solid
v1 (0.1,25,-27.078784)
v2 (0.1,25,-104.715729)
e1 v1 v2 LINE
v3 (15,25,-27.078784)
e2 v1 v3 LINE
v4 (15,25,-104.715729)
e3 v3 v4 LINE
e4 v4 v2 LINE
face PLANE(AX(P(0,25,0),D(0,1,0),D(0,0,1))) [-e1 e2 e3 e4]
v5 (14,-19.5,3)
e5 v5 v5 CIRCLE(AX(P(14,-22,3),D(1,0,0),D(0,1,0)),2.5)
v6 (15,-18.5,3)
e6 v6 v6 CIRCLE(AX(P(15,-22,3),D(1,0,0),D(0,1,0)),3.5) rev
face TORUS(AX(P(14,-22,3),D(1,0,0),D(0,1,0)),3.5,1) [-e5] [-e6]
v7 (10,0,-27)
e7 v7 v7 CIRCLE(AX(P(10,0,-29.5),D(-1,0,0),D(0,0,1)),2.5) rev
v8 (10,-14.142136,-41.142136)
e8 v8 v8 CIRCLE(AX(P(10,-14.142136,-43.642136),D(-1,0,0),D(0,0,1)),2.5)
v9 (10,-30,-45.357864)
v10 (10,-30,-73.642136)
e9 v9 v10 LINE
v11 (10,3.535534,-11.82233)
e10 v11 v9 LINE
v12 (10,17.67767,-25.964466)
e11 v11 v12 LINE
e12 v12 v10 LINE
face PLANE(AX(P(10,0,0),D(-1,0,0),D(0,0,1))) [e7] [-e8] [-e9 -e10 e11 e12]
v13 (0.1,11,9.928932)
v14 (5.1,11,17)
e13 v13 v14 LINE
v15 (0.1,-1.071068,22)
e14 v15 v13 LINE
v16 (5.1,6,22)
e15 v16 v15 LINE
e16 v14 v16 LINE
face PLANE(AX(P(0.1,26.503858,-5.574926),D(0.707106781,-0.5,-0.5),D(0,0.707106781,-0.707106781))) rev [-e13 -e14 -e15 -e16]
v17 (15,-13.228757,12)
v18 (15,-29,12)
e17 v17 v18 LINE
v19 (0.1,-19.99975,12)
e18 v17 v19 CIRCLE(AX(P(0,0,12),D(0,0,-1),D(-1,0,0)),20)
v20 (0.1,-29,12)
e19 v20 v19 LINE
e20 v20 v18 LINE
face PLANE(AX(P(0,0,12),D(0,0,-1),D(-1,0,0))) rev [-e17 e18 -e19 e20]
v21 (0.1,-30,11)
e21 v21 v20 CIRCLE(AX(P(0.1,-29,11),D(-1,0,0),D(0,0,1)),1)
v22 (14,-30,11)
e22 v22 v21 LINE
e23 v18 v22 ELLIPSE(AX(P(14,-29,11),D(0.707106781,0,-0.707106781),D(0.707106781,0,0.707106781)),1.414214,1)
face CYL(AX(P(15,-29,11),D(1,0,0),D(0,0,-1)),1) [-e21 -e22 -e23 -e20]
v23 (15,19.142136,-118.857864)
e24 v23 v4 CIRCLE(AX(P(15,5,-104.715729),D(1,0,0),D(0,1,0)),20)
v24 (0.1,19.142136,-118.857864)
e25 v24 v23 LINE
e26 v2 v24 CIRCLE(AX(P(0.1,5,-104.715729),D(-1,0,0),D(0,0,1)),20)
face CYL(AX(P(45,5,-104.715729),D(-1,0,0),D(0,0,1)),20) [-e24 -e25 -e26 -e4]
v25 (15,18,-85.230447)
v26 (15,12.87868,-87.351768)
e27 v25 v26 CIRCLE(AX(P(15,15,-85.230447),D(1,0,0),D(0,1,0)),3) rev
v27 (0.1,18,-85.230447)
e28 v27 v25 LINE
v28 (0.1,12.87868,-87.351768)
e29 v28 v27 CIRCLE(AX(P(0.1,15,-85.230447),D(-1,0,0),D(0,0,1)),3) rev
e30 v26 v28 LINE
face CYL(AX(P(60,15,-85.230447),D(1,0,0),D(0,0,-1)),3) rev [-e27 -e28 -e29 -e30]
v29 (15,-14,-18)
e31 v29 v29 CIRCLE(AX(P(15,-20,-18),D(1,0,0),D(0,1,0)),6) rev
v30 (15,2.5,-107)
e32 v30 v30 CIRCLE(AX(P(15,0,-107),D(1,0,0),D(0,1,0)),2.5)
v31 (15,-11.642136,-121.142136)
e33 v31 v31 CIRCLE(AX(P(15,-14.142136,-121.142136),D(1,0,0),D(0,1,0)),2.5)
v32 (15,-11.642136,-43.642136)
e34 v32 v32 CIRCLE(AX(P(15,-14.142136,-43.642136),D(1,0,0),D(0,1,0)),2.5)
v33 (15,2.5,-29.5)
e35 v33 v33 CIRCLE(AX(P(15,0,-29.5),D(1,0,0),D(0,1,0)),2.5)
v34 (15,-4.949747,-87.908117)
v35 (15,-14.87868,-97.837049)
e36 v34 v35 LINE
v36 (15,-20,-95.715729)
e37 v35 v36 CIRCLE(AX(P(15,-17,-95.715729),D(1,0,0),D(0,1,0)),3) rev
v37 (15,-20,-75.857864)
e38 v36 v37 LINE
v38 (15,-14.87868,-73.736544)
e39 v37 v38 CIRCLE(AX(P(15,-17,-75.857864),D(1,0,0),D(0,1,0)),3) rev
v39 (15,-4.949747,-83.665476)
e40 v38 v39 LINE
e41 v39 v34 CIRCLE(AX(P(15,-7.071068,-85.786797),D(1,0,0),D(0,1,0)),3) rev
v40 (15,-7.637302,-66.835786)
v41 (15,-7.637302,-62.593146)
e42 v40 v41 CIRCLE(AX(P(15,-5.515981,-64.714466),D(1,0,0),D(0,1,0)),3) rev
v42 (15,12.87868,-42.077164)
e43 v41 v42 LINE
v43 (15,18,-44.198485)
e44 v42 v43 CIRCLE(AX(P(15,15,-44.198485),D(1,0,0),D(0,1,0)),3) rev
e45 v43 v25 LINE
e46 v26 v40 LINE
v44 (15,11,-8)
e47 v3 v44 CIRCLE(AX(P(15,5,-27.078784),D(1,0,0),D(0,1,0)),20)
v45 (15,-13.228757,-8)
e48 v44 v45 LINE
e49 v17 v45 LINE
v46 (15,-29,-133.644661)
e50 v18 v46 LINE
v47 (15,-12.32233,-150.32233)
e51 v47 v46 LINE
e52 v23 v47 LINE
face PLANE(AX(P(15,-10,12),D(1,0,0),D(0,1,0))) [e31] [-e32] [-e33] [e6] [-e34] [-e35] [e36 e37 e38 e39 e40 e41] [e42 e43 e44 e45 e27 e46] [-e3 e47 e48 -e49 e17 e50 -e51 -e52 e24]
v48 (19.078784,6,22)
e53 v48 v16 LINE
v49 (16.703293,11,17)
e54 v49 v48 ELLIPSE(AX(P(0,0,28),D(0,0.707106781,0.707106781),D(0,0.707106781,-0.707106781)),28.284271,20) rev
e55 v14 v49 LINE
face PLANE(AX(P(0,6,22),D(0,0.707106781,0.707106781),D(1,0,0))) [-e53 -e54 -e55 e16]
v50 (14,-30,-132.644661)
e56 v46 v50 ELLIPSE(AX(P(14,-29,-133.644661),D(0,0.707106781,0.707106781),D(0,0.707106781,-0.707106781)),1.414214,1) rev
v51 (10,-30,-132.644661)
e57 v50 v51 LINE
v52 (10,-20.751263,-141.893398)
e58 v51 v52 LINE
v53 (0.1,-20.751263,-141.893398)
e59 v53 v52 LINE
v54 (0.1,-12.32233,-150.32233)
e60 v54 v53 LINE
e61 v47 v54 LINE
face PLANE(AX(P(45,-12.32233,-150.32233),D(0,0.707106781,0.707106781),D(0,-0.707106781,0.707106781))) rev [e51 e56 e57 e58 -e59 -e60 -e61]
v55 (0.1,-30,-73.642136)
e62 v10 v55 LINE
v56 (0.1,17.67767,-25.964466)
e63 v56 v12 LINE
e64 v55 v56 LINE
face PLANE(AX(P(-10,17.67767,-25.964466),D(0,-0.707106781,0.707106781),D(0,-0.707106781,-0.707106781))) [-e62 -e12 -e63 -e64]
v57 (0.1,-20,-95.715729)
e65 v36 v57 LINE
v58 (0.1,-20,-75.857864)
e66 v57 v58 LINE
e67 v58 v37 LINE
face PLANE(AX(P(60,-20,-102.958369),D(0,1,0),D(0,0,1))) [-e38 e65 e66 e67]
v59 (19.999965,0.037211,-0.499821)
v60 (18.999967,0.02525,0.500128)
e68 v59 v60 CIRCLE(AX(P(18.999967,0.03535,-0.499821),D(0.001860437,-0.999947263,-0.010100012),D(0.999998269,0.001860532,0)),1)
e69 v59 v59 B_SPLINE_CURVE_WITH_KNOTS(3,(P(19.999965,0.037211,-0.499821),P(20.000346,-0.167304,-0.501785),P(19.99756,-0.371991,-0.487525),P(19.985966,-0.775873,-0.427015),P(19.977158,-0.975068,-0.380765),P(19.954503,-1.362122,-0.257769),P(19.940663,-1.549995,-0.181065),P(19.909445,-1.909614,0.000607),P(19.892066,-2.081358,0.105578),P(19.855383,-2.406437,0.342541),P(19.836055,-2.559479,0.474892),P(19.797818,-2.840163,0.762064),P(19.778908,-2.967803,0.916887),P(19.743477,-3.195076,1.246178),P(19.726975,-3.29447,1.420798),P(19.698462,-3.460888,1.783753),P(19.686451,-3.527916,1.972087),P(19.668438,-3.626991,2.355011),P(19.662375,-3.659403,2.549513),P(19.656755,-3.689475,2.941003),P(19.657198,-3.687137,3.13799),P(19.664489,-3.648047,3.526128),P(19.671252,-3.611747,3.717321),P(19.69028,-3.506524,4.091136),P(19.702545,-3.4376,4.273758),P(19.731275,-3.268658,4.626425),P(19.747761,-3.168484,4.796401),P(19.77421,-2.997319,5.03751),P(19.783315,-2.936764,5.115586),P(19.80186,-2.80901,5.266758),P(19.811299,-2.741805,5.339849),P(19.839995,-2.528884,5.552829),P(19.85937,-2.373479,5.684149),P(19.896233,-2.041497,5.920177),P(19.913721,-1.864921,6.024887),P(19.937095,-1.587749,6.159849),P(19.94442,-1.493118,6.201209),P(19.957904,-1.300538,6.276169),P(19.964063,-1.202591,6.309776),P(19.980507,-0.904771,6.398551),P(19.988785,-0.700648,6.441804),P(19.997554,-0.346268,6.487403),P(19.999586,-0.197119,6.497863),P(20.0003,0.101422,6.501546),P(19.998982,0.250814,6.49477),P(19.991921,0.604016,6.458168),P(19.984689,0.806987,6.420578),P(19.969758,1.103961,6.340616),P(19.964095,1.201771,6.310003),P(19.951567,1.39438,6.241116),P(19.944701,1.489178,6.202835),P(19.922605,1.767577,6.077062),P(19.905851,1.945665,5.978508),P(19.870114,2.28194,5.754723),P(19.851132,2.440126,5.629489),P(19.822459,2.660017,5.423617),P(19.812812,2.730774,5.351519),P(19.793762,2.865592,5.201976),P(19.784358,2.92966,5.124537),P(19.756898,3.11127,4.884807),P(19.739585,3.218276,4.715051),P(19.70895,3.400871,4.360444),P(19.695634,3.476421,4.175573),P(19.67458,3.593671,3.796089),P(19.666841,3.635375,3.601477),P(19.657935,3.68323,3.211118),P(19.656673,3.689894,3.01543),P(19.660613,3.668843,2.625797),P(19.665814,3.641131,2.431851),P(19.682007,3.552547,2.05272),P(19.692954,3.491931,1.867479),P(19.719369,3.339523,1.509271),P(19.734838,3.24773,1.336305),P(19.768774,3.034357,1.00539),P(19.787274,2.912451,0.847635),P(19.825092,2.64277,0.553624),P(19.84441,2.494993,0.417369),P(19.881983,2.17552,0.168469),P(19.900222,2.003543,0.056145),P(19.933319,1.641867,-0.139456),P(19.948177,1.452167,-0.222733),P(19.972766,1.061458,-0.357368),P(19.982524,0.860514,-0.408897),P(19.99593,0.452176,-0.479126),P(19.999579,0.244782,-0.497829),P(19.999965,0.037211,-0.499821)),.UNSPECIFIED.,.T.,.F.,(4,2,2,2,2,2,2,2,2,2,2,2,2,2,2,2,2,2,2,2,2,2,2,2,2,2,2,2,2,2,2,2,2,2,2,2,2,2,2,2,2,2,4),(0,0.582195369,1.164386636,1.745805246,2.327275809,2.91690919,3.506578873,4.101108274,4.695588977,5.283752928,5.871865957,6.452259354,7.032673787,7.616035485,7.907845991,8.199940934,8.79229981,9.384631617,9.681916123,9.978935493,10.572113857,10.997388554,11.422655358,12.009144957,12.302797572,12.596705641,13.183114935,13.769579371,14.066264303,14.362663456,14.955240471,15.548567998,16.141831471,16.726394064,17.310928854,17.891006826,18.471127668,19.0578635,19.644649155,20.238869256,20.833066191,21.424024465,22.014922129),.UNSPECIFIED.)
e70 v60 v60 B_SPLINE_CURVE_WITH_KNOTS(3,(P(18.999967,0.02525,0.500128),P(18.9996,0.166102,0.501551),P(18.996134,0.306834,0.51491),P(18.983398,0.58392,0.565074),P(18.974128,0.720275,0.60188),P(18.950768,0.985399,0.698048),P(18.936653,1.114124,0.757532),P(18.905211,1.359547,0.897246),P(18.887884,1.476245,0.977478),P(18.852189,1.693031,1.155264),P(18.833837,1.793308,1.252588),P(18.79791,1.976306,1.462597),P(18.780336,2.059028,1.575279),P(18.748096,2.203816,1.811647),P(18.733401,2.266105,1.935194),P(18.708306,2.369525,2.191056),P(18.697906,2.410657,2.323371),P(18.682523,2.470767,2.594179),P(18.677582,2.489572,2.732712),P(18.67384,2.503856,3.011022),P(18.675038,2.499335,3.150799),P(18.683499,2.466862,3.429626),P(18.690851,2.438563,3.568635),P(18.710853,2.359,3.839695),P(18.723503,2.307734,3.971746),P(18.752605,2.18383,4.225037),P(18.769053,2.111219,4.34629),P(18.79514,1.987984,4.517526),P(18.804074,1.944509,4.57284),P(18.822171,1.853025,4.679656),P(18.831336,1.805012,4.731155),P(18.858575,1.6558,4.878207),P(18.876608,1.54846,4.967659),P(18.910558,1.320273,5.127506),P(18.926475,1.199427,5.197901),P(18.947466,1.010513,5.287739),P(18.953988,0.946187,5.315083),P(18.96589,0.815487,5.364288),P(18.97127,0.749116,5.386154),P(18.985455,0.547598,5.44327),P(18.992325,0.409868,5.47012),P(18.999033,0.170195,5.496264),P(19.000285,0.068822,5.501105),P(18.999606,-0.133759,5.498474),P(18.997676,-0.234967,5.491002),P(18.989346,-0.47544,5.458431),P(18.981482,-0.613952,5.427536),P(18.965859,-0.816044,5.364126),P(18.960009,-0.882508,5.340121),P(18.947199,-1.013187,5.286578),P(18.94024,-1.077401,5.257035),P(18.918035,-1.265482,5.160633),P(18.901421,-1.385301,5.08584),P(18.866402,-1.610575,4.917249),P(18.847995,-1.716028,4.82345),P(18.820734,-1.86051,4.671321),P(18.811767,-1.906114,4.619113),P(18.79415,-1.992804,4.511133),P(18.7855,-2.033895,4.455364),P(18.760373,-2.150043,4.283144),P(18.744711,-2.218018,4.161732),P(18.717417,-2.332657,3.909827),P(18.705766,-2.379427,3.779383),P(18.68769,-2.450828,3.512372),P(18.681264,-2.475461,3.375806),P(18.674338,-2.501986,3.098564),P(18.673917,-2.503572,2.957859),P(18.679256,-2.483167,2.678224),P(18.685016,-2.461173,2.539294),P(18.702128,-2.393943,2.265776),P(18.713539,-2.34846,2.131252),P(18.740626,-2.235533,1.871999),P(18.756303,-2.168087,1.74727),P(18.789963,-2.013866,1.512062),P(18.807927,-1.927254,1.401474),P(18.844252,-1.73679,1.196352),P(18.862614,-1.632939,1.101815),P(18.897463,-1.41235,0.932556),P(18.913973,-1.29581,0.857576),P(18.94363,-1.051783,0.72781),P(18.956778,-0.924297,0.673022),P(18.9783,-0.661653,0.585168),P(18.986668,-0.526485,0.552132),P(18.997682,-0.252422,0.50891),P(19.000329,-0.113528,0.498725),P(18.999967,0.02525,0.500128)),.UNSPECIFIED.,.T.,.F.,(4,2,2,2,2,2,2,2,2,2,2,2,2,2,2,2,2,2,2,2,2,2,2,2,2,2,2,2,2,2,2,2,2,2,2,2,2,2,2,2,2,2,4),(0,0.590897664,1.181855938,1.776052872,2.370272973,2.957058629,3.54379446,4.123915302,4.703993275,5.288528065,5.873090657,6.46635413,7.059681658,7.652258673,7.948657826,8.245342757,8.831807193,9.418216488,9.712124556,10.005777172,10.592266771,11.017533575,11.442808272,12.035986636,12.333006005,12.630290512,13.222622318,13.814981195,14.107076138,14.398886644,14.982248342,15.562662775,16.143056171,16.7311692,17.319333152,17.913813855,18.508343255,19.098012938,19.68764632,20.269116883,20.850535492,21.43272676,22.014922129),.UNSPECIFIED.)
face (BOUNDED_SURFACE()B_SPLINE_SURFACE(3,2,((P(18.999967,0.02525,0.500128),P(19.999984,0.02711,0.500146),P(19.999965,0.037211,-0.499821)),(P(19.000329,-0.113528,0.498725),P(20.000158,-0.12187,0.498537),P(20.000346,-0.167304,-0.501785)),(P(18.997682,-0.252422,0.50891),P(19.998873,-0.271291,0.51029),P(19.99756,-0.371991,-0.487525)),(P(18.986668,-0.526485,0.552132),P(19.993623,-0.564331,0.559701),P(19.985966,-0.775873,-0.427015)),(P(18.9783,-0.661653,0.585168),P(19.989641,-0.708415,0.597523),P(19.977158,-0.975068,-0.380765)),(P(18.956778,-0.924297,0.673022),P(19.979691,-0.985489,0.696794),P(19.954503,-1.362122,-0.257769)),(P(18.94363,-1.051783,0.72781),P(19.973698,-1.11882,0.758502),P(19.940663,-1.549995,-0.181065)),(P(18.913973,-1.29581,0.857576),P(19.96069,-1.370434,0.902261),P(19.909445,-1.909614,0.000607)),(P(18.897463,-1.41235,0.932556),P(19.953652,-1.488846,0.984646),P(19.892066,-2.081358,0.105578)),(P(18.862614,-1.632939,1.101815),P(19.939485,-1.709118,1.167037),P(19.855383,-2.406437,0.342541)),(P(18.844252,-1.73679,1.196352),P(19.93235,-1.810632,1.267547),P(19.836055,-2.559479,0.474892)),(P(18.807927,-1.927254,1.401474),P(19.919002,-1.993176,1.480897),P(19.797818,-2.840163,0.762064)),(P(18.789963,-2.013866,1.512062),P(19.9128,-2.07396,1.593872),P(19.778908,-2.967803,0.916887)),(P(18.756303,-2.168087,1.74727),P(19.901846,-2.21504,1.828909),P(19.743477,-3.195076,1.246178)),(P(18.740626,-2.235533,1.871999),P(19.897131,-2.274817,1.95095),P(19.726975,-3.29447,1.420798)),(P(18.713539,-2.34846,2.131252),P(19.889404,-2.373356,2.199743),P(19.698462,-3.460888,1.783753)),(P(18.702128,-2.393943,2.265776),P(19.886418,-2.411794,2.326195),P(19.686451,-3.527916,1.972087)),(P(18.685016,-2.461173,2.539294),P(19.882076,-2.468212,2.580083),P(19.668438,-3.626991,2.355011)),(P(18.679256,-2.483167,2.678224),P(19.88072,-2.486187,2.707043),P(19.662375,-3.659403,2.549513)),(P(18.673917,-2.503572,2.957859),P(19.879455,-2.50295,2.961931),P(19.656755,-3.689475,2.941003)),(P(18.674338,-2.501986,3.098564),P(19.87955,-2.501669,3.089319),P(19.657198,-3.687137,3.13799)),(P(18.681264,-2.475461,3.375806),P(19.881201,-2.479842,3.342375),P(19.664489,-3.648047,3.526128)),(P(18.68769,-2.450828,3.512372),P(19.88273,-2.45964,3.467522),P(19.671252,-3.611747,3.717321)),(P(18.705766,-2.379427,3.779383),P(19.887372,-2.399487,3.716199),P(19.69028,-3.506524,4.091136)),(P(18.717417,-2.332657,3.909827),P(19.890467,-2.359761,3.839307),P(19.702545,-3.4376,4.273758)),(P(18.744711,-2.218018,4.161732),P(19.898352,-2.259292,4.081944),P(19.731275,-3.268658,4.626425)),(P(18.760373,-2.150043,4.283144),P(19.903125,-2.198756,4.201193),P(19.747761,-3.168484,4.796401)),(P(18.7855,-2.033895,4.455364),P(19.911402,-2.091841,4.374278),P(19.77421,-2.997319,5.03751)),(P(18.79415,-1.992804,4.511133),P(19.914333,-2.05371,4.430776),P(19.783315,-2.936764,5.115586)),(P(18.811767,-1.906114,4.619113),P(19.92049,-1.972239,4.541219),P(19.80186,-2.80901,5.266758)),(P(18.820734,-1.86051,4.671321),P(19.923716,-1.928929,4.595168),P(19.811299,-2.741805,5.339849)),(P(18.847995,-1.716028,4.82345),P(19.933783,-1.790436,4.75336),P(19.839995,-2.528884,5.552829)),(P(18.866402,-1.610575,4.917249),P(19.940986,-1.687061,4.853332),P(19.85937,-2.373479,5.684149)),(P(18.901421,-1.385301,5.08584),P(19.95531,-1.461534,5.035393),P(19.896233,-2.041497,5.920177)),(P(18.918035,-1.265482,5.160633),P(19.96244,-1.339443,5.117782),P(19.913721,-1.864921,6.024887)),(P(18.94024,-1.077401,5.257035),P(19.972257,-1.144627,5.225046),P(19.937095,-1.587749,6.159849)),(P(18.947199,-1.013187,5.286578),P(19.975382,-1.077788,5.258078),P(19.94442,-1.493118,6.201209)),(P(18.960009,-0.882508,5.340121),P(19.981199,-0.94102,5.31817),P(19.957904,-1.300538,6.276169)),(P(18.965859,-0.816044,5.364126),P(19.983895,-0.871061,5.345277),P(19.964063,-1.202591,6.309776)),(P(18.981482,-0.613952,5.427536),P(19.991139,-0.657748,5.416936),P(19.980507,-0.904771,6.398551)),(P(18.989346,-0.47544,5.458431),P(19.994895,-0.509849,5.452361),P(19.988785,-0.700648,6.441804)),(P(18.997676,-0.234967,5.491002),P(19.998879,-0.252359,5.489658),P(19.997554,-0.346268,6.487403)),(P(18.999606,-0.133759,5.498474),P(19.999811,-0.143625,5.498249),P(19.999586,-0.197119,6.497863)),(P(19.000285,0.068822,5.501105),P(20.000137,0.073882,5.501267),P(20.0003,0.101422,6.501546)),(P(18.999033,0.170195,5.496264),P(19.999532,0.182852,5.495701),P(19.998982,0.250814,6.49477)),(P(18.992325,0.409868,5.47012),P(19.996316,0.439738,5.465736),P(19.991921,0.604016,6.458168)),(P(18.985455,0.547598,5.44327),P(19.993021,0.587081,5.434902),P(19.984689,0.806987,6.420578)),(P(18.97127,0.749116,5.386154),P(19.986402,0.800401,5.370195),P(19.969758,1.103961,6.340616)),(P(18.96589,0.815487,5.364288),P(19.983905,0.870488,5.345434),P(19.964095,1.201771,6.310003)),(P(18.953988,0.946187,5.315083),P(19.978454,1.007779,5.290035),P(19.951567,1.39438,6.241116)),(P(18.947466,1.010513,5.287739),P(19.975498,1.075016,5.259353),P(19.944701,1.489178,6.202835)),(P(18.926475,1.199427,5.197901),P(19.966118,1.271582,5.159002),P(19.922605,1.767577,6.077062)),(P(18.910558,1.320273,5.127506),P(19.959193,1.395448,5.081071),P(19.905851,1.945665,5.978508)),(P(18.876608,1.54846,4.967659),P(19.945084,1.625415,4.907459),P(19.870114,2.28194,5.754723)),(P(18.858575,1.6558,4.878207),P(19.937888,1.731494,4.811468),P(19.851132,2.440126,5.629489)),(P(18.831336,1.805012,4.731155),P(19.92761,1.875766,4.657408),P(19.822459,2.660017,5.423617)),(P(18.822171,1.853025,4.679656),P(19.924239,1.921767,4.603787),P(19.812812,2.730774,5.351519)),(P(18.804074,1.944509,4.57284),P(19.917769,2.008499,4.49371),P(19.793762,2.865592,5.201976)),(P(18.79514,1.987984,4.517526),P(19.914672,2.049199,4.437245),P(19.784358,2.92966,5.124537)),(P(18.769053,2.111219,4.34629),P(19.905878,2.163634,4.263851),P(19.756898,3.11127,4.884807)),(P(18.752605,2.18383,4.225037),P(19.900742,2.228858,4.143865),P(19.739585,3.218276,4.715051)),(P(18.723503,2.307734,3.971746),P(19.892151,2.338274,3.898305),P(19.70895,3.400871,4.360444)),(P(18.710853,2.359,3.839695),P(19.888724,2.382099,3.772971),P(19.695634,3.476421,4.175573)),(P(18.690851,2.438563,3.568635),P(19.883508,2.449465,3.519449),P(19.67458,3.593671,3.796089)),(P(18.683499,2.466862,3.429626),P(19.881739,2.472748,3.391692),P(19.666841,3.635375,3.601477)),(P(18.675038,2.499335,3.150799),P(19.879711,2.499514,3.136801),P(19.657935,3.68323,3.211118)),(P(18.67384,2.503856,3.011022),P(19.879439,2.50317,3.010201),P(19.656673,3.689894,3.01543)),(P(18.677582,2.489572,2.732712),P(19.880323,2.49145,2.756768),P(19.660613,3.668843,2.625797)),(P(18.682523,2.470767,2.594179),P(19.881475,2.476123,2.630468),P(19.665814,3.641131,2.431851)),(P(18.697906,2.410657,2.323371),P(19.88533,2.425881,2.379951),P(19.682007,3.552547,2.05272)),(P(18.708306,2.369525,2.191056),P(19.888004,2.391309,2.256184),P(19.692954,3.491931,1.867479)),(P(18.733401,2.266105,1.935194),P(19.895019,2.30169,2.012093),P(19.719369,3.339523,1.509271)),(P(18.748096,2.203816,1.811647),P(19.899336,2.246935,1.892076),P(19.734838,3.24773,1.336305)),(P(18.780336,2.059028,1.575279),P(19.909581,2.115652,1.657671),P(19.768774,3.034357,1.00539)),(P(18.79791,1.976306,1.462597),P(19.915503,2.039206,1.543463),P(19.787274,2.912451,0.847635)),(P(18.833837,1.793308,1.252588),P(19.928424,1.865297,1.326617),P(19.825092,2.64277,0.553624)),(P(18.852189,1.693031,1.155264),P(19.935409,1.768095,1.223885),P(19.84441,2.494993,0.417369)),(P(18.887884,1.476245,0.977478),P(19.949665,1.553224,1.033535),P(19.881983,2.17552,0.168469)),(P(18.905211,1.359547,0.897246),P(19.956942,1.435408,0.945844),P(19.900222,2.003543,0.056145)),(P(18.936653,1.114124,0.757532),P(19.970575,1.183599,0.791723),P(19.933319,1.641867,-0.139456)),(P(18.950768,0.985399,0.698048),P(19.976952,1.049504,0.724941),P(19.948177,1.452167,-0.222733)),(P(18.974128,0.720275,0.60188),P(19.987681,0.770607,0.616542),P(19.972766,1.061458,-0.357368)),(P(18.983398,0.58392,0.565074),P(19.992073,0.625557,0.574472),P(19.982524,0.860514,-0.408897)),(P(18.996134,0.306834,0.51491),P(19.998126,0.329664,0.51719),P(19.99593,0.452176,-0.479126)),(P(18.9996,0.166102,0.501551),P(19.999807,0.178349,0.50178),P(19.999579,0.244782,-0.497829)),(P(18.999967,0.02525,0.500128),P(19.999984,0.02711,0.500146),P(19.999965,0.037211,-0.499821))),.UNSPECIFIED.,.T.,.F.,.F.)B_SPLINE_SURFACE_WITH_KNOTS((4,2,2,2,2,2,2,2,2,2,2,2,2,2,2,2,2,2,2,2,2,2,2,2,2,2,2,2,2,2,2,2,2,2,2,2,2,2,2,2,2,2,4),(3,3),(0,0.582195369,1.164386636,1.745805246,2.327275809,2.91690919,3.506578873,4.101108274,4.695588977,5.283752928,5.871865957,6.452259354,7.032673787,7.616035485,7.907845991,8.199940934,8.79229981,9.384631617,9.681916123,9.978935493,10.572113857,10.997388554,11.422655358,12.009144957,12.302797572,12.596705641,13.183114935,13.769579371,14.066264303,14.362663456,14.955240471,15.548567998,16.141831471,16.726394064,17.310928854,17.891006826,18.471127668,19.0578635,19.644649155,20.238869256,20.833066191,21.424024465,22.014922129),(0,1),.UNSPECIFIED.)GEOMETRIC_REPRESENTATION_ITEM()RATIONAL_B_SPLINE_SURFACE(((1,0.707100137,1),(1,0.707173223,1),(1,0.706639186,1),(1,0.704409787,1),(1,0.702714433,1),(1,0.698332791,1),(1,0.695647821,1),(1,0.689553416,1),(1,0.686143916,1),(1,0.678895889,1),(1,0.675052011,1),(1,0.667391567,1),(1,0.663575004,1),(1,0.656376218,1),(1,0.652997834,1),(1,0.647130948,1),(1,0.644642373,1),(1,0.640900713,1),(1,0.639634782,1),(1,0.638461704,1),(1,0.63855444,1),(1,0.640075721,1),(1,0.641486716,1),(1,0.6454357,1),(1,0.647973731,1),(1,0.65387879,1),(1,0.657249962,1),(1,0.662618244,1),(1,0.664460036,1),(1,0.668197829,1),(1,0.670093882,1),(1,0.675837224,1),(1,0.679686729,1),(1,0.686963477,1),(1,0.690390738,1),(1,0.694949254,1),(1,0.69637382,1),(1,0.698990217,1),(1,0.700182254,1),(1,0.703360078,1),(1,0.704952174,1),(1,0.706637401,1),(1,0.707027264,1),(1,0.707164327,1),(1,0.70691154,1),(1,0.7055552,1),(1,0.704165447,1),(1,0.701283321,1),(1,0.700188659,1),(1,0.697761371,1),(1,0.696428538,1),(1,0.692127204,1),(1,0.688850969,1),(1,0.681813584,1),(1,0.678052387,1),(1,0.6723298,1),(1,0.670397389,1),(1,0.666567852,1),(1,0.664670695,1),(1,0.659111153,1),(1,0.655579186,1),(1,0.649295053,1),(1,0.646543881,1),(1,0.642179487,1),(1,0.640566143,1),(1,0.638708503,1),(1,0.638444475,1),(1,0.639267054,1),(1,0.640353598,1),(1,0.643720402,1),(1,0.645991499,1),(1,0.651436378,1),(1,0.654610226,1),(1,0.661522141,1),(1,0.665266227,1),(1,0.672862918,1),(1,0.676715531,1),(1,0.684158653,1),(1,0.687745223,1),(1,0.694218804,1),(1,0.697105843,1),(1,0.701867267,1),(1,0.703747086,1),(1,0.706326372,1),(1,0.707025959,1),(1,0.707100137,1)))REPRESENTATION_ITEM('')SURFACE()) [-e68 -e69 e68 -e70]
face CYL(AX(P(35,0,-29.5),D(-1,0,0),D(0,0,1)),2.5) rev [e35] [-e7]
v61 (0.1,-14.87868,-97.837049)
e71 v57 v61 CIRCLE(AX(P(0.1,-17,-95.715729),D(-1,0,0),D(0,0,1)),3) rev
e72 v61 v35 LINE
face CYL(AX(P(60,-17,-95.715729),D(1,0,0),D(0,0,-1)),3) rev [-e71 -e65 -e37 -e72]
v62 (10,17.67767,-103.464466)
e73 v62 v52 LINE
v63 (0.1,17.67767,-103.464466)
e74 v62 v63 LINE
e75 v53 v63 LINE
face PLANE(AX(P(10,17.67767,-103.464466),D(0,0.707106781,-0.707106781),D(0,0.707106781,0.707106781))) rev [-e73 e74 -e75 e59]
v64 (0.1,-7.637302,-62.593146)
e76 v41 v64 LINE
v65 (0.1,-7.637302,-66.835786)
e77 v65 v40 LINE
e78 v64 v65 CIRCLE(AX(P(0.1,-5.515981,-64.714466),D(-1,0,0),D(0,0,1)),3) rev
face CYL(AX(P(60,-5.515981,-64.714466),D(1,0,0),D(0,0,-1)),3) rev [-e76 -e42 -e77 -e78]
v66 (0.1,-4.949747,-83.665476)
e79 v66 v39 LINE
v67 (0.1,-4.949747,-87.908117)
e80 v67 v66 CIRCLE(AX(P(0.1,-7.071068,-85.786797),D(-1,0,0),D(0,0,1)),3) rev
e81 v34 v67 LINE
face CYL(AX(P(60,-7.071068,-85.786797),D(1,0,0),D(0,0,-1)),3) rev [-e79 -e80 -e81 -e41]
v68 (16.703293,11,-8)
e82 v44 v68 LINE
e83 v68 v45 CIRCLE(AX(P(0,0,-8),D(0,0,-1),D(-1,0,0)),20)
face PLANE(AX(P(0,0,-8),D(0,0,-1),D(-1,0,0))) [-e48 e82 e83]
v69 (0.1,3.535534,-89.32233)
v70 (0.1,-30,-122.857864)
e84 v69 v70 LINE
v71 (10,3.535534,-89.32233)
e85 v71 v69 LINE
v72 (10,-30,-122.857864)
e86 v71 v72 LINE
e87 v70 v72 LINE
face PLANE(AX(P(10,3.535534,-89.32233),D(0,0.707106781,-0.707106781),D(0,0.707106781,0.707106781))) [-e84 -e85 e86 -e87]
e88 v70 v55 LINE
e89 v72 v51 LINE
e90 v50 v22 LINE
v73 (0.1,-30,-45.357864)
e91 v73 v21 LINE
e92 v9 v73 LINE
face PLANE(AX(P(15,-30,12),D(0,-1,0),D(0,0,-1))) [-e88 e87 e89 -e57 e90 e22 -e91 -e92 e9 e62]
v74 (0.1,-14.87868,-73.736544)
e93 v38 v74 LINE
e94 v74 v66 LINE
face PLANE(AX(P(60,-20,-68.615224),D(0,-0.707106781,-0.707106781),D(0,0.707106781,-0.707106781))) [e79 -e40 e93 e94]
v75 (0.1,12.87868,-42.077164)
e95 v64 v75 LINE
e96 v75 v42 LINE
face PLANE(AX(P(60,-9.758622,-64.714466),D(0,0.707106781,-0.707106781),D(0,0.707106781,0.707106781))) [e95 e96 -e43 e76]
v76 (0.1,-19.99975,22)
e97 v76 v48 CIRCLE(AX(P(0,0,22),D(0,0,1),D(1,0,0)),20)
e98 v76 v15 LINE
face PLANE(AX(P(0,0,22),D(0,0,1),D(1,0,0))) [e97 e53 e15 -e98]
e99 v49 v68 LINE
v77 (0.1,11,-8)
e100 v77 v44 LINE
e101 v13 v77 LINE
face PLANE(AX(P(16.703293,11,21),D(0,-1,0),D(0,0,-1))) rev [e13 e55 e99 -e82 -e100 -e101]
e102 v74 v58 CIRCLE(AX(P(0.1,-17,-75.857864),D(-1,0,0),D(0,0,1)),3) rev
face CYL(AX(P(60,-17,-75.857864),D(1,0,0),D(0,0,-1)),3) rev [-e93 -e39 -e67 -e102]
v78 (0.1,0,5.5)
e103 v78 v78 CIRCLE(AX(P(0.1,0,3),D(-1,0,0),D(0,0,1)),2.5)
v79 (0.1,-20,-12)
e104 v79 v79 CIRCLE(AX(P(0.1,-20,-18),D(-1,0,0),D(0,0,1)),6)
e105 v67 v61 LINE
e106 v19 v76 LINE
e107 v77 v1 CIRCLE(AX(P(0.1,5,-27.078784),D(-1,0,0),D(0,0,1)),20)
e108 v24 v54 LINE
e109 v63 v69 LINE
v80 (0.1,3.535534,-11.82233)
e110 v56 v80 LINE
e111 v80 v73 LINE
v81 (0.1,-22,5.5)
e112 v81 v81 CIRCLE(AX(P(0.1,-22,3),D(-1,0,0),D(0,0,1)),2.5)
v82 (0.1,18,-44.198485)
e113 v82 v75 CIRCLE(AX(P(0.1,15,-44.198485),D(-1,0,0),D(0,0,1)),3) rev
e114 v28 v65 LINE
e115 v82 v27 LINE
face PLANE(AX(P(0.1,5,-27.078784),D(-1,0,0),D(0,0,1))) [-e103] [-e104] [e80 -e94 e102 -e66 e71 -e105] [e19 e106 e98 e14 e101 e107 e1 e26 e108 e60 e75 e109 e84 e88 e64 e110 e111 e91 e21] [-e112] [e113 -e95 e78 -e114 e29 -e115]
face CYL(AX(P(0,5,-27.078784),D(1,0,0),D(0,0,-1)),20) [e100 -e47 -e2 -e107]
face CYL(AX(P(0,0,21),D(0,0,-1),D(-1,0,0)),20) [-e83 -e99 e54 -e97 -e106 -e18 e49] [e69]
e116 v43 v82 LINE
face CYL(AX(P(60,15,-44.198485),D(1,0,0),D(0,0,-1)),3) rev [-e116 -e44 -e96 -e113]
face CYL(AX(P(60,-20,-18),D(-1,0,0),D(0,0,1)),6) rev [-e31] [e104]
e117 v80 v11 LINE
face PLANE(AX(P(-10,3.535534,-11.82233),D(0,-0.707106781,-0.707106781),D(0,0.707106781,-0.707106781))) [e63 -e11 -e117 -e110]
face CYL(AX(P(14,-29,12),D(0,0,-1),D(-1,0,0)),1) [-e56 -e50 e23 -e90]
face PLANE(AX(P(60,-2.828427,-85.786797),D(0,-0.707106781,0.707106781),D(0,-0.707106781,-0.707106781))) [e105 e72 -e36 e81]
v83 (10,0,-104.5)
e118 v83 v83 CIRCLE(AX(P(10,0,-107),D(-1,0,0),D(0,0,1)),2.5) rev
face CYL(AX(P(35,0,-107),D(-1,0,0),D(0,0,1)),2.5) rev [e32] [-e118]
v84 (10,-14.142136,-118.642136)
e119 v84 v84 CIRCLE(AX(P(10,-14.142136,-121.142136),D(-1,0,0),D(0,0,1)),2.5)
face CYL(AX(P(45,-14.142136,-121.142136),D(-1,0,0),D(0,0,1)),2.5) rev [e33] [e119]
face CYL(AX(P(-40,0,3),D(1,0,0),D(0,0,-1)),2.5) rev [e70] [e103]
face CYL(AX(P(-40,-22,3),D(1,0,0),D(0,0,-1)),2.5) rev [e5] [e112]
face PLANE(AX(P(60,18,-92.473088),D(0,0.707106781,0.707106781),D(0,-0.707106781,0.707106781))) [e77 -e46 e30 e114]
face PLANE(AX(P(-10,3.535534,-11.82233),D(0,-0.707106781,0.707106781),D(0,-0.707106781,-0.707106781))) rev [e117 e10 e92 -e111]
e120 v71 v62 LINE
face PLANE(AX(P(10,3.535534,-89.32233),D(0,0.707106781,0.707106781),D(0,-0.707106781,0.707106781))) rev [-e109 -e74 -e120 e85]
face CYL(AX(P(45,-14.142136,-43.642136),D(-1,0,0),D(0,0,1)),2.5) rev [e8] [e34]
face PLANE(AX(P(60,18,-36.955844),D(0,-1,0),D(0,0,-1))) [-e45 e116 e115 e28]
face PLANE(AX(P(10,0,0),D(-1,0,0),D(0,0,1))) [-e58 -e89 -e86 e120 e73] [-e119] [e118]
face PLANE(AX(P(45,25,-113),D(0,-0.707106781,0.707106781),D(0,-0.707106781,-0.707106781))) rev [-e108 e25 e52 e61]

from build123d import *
from build123d.topology import SkipClean

# Parameters (mm, degrees)
EXTRUDE_1_DEPTH            = 21
SKETCH_2_W                 = 20
SKETCH_2_H                 = 20
CUT_EXTRUDE_1_DEPTH        = 10
SKETCH_3_R                 = 25
EXTRUDE_2_DEPTH            = 2
SKETCH_4_W                 = 20
SKETCH_4_H                 = 20
CUT_EXTRUDE_2_DEPTH        = 20
SKETCH_5_W                 = 67.669648092
SKETCH_5_H                 = 52.455829112
CUT_EXTRUDE_3_DEPTH        = 22
EXTRUDE_5_DEPTH            = 1
CUT_EXTRUDE_START          = -6
CUT_EXTRUDE_12_DEPTH       = 6
CUT_EXTRUDE_13_DEPTH       = 2
SKETCH_21_W                = 20
SKETCH_21_H                = 20
EXTRUDE_7_DEPTH            = 19
SKETCH_22_W                = 30
SKETCH_22_H                = 20
EXTRUDE_8_DEPTH            = 10
EXTRUDE_START              = 10
EXTRUDE_9_DEPTH            = 10
SKETCH_24_W                = 30
SKETCH_24_H                = 50
EXTRUDE_10_DEPTH           = 160
SKETCH_26_R                = 2.5
CUT_EXTRUDE_15_DEPTH       = 50
CUT_EXTRUDE_1_2_DEPTH      = 10
CUT_EXTRUDE_1_2_DEPTH_BACK = 10
SKETCH_28_W                = 30
SKETCH_28_H                = 160
EXTRUDE_11_DEPTH           = 5
CUT_EXTRUDE_16_DEPTH       = 25
CUT_EXTRUDE_16_DEPTH_BACK  = 60
SKETCH_29_R                = 2.5
CUT_EXTRUDE_17_DEPTH       = 60
CUT_EXTRUDE_18_DEPTH       = 60
CUT_EXTRUDE_18_DEPTH_BACK  = 60
CUT_EXTRUDE_19_DEPTH       = 60
CUT_EXTRUDE_19_DEPTH_BACK  = 60
FILLET_4_R                 = 3
CUT_EXTRUDE_20_DEPTH       = 60
CUT_EXTRUDE_20_DEPTH_BACK  = 60
SKETCH_33_R                = 6
CUT_EXTRUDE_21_DEPTH       = 60
FILLET_5_R                 = 20
SKETCH_35_R                = 2.5
CUT_EXTRUDE_22_DEPTH       = 60
FILLET_6_R                 = 20
SKETCH_36_W                = 257.466692503
SKETCH_36_H                = 187.225779306
CUT_EXTRUDE_23_DEPTH       = 82
CUT_EXTRUDE_24_DEPTH       = 0.1
FILLET_7_R                 = 1
FILLET_8_R                 = 1
CHAMFER_1_SIZE             = 5
CHAMFER_2_SIZE             = 5


with BuildPart() as part:
    # 草图1 → 凸台-拉伸1 (new body)
    with BuildSketch(Plane.XY):
        with BuildLine():
            Line((16.703293088, 11), (-16.703293088, 11))
            ThreePointArc((-16.703293088, 11), (0, -20), (16.703293088, 11))
        make_face()
    extrude(amount=EXTRUDE_1_DEPTH)

    # 草图2 → Cut-Extrude 1 (cut)
    with BuildSketch(Plane.XY.offset(21)):
        Rectangle(SKETCH_2_W, SKETCH_2_H)
    extrude(amount=-CUT_EXTRUDE_1_DEPTH, mode=Mode.SUBTRACT)

    # 草图3 → 凸台-拉伸2 (add)
    with BuildSketch(Plane(origin=(0, 0, 0), x_dir=(-1, 0, 0), z_dir=(0, 0, -1))):
        Circle(SKETCH_3_R)
        with BuildLine():
            Line((16.703293088, 11), (-16.703293088, 11))
            ThreePointArc((-16.703293088, 11), (0, -20), (16.703293088, 11))
        make_face(mode=Mode.SUBTRACT)
    extrude(amount=-EXTRUDE_2_DEPTH)

    # 草图4 → 切除-拉伸2 (cut)
    with BuildSketch(Plane.XY.offset(11)):
        Rectangle(SKETCH_4_W, SKETCH_4_H)
    extrude(amount=-CUT_EXTRUDE_2_DEPTH, mode=Mode.SUBTRACT)

    # 草图5 → 切除-拉伸3 (cut)
    with BuildSketch(Plane(origin=(0, 11, 0), x_dir=(1, 0, 0), z_dir=(0, 1, 0))):
        Rectangle(SKETCH_5_W, SKETCH_5_H)
    extrude(amount=CUT_EXTRUDE_3_DEPTH, mode=Mode.SUBTRACT)

    # 草图10 → 凸台-拉伸5 (add)
    with BuildSketch(Plane.XY.offset(21)):
        with BuildLine():
            Line((16.703293088, 11), (-16.703293088, 11))
            ThreePointArc((-16.703293088, 11), (0, -20), (16.703293088, 11))
        make_face()
    extrude(amount=EXTRUDE_5_DEPTH)

    # 草图18 → 切除-拉伸12 (cut)
    with SkipClean():  # the faces are left unmerged after this step: merging them gives an invalid solid
        with BuildSketch(Plane.XY.offset(2).offset(CUT_EXTRUDE_START)):
            with BuildLine():
                Line((-16.703293088, 11), (-22.449944321, 11))
                ThreePointArc((-22.449944321, 11), (0, -25), (22.449944321, 11))
                Line((22.449944321, 11), (16.703293088, 11))
                ThreePointArc((16.703293088, 11), (0, -20), (-16.703293088, 11))
            make_face()
        extrude(amount=CUT_EXTRUDE_12_DEPTH, mode=Mode.SUBTRACT)

    # 草图19 → 切除-拉伸13 (cut)
    with BuildSketch(Plane(origin=(0, 0, 0), x_dir=(-1, 0, 0), z_dir=(0, 0, -1))):
        with BuildLine():
            Line((16.703293088, 11), (-16.703293088, 11))
            ThreePointArc((-16.703293088, 11), (0, -20), (16.703293088, 11))
        make_face()
    extrude(amount=-CUT_EXTRUDE_13_DEPTH, mode=Mode.SUBTRACT)

    # 草图21 → 凸台-拉伸7 (add)
    with BuildSketch(Plane(origin=(0, 0, 21), x_dir=(-1, 0, 0), z_dir=(0, 0, -1))):
        Rectangle(SKETCH_21_W, SKETCH_21_H)
    extrude(amount=EXTRUDE_7_DEPTH)

    # 草图22 → 凸台-拉伸8 (add)
    with BuildSketch(Plane(origin=(0, 0, 2), x_dir=(-1, 0, 0), z_dir=(0, 0, -1))):
        with Locations((0, -20)):
            Rectangle(SKETCH_22_W, SKETCH_22_H)
    extrude(amount=-EXTRUDE_8_DEPTH)

    # 草图23 → 凸台-拉伸9 (add)
    with SkipClean():  # the faces are left unmerged after this step: merging them gives an invalid solid
        with BuildSketch(Plane(origin=(0, 0, 2), x_dir=(-1, 0, 0), z_dir=(0, 0, -1)).offset(EXTRUDE_START)):
            with BuildLine():
                Line((-15, -13.228756555), (-15, -30))
                Line((-15, -30), (15, -30))
                Line((15, -30), (15, -13.228756555))
                ThreePointArc((15, -13.228756555), (19.950760868, -1.402547961), (16.703293088, 11))
                Line((16.703293088, 11), (-16.703293088, 11))
                ThreePointArc((-16.703293088, 11), (-19.950760868, -1.402547961), (-15, -13.228756555))
            make_face()
        extrude(amount=-EXTRUDE_9_DEPTH)

    # 草图24 → 凸台-拉伸10 (add)
    with SkipClean():  # the faces are left unmerged after this step: merging them gives an invalid solid
        with BuildSketch(Plane(origin=(0, 0, -8), x_dir=(-1, 0, 0), z_dir=(0, 0, -1))):
            with Locations((0, -5)):
                Rectangle(SKETCH_24_W, SKETCH_24_H)
        extrude(amount=EXTRUDE_10_DEPTH)

    # 草图26 → 切除-拉伸15 (cut)
    with SkipClean():  # the faces are left unmerged after this step: merging them gives an invalid solid
        with BuildSketch(Plane.ZY.offset(15)):
            with Locations((-107, 0)):
                Circle(SKETCH_26_R)
            with Locations((-29.5, 0)):
                Circle(SKETCH_26_R)
        extrude(amount=-CUT_EXTRUDE_15_DEPTH, mode=Mode.SUBTRACT)

    # 草图27 → Cut-Extrude 1 2 (cut, two sides: drawn at the far end of the back side and taken through both)
    with SkipClean():  # the faces are left unmerged after this step: merging them gives an invalid solid
        with BuildSketch(Plane(origin=(0, 0, 0), x_dir=(0, 0, -1), z_dir=(1, 0, 0)).offset(-CUT_EXTRUDE_1_2_DEPTH_BACK)):
            Polygon((89.32233047, 3.535533906), (138.819805153, -45.961940777), (152.961940777, -31.819805153), (103.464466094, 17.67766953), align=None)
            Polygon((11.82233047, 3.535533906), (61.319805153, -45.961940777), (75.461940777, -31.819805153), (25.964466094, 17.67766953), align=None)
        extrude(amount=CUT_EXTRUDE_1_2_DEPTH + CUT_EXTRUDE_1_2_DEPTH_BACK, mode=Mode.SUBTRACT)

    # 草图28 → 凸台-拉伸11 (add)
    with SkipClean():  # the faces are left unmerged after this step: merging them gives an invalid solid
        with BuildSketch(Plane(origin=(0, 20, 0), x_dir=(1, 0, 0), z_dir=(0, 1, 0))):
            with Locations((0, 88)):
                Rectangle(SKETCH_28_W, SKETCH_28_H)
        extrude(amount=EXTRUDE_11_DEPTH)

    # 草图29 → 切除-拉伸16 (cut, two sides: drawn at the far end of the back side and taken through both)
    with SkipClean():  # the faces are left unmerged after this step: merging them gives an invalid solid
        with BuildSketch(Plane.ZY.offset(15).offset(-CUT_EXTRUDE_16_DEPTH_BACK)):
            with Locations(Location((3, 0, 0), (0, 0, 180))):
                Circle(SKETCH_29_R)
            with Locations(Location((3, -22, 0), (0, 0, 90))):
                Circle(SKETCH_29_R)
        extrude(amount=CUT_EXTRUDE_16_DEPTH + CUT_EXTRUDE_16_DEPTH_BACK, mode=Mode.SUBTRACT)

    # 草图30 → 切除-拉伸17 (cut)
    with SkipClean():  # the faces are left unmerged after this step: merging them gives an invalid solid
        with BuildSketch(Plane.ZY.offset(15)):
            Polygon((-113, 25), (-168, -30), (-168, 25), align=None)
        extrude(amount=-CUT_EXTRUDE_17_DEPTH, mode=Mode.SUBTRACT)

    # 草图31 → 切除-拉伸18 (cut, two sides: drawn at the far end of the back side and taken through both)
    with SkipClean():  # the faces are left unmerged after this step: merging them gives an invalid solid
        with BuildSketch(Plane(origin=(0, 0, 0), x_dir=(0, 0, -1), z_dir=(1, 0, 0)).offset(-CUT_EXTRUDE_18_DEPTH_BACK)):
            Polygon((92.473088065, 18), (64.714466094, -9.758621971), (36.955844123, 18), align=None)
        extrude(amount=CUT_EXTRUDE_18_DEPTH + CUT_EXTRUDE_18_DEPTH_BACK, mode=Mode.SUBTRACT)

    # 草图32 → 切除-拉伸19 (cut, two sides: drawn at the far end of the back side and taken through both)
    with SkipClean():  # the faces are left unmerged after this step: merging them gives an invalid solid
        with BuildSketch(Plane(origin=(0, 0, 0), x_dir=(0, 0, -1), z_dir=(1, 0, 0)).offset(-CUT_EXTRUDE_19_DEPTH_BACK)):
            Polygon((85.786796564, -2.828427125), (102.95836944, -20), (68.615223689, -20), align=None)
        extrude(amount=CUT_EXTRUDE_19_DEPTH + CUT_EXTRUDE_19_DEPTH_BACK, mode=Mode.SUBTRACT)

    # 圆角4
    fillet_4_edges = [part.edges().sort_by_distance(p)[0] for p in [
        (0, 18, -92.473088065),
        (0, 18, -36.955844123),
        (0, -9.758621971, -64.714466094),
        (0, -2.828427125, -85.786796564),
        (0, -20, -68.615223689),
        (0, -20, -102.95836944),
    ]]
    fillet(fillet_4_edges, radius=FILLET_4_R)

    # 草图33 → 切除-拉伸20 (cut, two sides: drawn at the far end of the back side and taken through both)
    with BuildSketch(Plane(origin=(0, 0, 0), x_dir=(0, 0, -1), z_dir=(1, 0, 0)).offset(-CUT_EXTRUDE_20_DEPTH_BACK)):
        with Locations(Location((18, -20, 0), (0, 0, 180))):
            Circle(SKETCH_33_R)
    extrude(amount=CUT_EXTRUDE_20_DEPTH + CUT_EXTRUDE_20_DEPTH_BACK, mode=Mode.SUBTRACT)

    # 草图34 → 切除-拉伸21 (cut)
    with BuildSketch(Plane.ZY.offset(15)):
        Polygon((-150.32233047, -12.32233047), (-132.644660941, -30), (-168, -30), align=None)
    extrude(amount=-CUT_EXTRUDE_21_DEPTH, mode=Mode.SUBTRACT)

    # 圆角5
    fillet_5_edges = [part.edges().sort_by_distance(p)[0] for p in [
        (0, 25, -113),
    ]]
    fillet(fillet_5_edges, radius=FILLET_5_R)

    # 草图35 → 切除-拉伸22 (cut)
    with BuildSketch(Plane.ZY.offset(15)):
        with Locations((-29.5, 0)):
            Circle(SKETCH_35_R)
        with Locations((-107, 0)):
            Circle(SKETCH_35_R)
        with Locations((-121.142135624, -14.142135624)):
            Circle(SKETCH_35_R)
        with Locations((-43.642135624, -14.142135624)):
            Circle(SKETCH_35_R)
    extrude(amount=-CUT_EXTRUDE_22_DEPTH, mode=Mode.SUBTRACT)

    # 圆角6
    # the kernel refuses this fillet: 20 mm, written as the material it takes off along each edge
    with BuildSketch(Plane(origin=(-62.696960071, 25, -8), x_dir=(0, 0, -1), z_dir=(1, 0, 0))) as fillet_6_piece_1:
        with BuildLine():
            CenterArc((19.078784028, -20), FILLET_6_R, 90, 72.542396876)
            Line((0, -14), (-0.381575681, -13.88))
            ThreePointArc((-0.381575681, -13.88), (-0.4, -7), (-0.4, 0))
            Line((-0.4, 0), (0, 0.4))
            Line((0, 0.4), (19.078784028, 0.4))
            Line((19.078784028, 0.4), (19.078784028, 0))
        make_face()
    extrude(amount=125.393920142, mode=Mode.SUBTRACT)

    # 草图36 → 切除-拉伸23 (cut)
    with BuildSketch(Plane(origin=(0, 0, 0), x_dir=(0, 0, -1), z_dir=(1, 0, 0))):
        with Locations((64.036181404, -32.621103346)):
            Rectangle(SKETCH_36_W, SKETCH_36_H)
    extrude(amount=-CUT_EXTRUDE_23_DEPTH, mode=Mode.SUBTRACT)

    # 草图37 → 切除-拉伸24 (cut)
    with BuildSketch(Plane.ZY):
        with BuildLine():
            Line((-11.82233047, 3.535533906), (-45.357864376, -30))
            Line((-45.357864376, -30), (12, -30))
            Line((12, -30), (12, -20))
            Line((12, -20), (22, -20))
            Line((22, -20), (22, 11))
            Line((22, 11), (-8, 11))
            ThreePointArc((-8, 11), (-15.246624462, 21.124515497), (-27.078784028, 25))
            Line((-27.078784028, 25), (-104.715728753, 25))
            ThreePointArc((-104.715728753, 25), (-112.3693974, 23.47759065), (-118.857864376, 19.142135624))
            Line((-118.857864376, 19.142135624), (-150.32233047, -12.32233047))
            Line((-150.32233047, -12.32233047), (-141.893398282, -20.751262658))
            Line((-141.893398282, -20.751262658), (-103.464466094, 17.67766953))
            Line((-103.464466094, 17.67766953), (-89.32233047, 3.535533906))
            Line((-89.32233047, 3.535533906), (-122.857864376, -30))
            Line((-122.857864376, -30), (-73.642135624, -30))
            Line((-73.642135624, -30), (-25.964466094, 17.67766953))
            Line((-25.964466094, 17.67766953), (-11.82233047, 3.535533906))
        make_face()
    extrude(amount=-CUT_EXTRUDE_24_DEPTH, mode=Mode.SUBTRACT)

    # 圆角7
    fillet_7_edges = [part.edges().sort_by_distance(p)[0] for p in [
        (20, 0, 5.5),
        (15, -24.5, 3),
    ]]
    fillet(fillet_7_edges, radius=FILLET_7_R)

    # 圆角8
    fillet_8_edges = [part.edges().sort_by_distance(p)[0] for p in [
        (15, -30, -60.32233047),
        (7.55, -30, 12),
    ]]
    fillet(fillet_8_edges, radius=FILLET_8_R)

    # 倒角1
    chamfer_1_edges = [part.edges().sort_by_distance(p)[0] for p in [
        (8.401646544, 11, 22),
    ]]
    chamfer(chamfer_1_edges, length=CHAMFER_1_SIZE)

    # 倒角2
    chamfer_2_edges = [part.edges().sort_by_distance(p)[0] for p in [
        (0.1, 8.5, 19.5),
    ]]
    chamfer(chamfer_2_edges, length=CHAMFER_2_SIZE)


solid = part.part
